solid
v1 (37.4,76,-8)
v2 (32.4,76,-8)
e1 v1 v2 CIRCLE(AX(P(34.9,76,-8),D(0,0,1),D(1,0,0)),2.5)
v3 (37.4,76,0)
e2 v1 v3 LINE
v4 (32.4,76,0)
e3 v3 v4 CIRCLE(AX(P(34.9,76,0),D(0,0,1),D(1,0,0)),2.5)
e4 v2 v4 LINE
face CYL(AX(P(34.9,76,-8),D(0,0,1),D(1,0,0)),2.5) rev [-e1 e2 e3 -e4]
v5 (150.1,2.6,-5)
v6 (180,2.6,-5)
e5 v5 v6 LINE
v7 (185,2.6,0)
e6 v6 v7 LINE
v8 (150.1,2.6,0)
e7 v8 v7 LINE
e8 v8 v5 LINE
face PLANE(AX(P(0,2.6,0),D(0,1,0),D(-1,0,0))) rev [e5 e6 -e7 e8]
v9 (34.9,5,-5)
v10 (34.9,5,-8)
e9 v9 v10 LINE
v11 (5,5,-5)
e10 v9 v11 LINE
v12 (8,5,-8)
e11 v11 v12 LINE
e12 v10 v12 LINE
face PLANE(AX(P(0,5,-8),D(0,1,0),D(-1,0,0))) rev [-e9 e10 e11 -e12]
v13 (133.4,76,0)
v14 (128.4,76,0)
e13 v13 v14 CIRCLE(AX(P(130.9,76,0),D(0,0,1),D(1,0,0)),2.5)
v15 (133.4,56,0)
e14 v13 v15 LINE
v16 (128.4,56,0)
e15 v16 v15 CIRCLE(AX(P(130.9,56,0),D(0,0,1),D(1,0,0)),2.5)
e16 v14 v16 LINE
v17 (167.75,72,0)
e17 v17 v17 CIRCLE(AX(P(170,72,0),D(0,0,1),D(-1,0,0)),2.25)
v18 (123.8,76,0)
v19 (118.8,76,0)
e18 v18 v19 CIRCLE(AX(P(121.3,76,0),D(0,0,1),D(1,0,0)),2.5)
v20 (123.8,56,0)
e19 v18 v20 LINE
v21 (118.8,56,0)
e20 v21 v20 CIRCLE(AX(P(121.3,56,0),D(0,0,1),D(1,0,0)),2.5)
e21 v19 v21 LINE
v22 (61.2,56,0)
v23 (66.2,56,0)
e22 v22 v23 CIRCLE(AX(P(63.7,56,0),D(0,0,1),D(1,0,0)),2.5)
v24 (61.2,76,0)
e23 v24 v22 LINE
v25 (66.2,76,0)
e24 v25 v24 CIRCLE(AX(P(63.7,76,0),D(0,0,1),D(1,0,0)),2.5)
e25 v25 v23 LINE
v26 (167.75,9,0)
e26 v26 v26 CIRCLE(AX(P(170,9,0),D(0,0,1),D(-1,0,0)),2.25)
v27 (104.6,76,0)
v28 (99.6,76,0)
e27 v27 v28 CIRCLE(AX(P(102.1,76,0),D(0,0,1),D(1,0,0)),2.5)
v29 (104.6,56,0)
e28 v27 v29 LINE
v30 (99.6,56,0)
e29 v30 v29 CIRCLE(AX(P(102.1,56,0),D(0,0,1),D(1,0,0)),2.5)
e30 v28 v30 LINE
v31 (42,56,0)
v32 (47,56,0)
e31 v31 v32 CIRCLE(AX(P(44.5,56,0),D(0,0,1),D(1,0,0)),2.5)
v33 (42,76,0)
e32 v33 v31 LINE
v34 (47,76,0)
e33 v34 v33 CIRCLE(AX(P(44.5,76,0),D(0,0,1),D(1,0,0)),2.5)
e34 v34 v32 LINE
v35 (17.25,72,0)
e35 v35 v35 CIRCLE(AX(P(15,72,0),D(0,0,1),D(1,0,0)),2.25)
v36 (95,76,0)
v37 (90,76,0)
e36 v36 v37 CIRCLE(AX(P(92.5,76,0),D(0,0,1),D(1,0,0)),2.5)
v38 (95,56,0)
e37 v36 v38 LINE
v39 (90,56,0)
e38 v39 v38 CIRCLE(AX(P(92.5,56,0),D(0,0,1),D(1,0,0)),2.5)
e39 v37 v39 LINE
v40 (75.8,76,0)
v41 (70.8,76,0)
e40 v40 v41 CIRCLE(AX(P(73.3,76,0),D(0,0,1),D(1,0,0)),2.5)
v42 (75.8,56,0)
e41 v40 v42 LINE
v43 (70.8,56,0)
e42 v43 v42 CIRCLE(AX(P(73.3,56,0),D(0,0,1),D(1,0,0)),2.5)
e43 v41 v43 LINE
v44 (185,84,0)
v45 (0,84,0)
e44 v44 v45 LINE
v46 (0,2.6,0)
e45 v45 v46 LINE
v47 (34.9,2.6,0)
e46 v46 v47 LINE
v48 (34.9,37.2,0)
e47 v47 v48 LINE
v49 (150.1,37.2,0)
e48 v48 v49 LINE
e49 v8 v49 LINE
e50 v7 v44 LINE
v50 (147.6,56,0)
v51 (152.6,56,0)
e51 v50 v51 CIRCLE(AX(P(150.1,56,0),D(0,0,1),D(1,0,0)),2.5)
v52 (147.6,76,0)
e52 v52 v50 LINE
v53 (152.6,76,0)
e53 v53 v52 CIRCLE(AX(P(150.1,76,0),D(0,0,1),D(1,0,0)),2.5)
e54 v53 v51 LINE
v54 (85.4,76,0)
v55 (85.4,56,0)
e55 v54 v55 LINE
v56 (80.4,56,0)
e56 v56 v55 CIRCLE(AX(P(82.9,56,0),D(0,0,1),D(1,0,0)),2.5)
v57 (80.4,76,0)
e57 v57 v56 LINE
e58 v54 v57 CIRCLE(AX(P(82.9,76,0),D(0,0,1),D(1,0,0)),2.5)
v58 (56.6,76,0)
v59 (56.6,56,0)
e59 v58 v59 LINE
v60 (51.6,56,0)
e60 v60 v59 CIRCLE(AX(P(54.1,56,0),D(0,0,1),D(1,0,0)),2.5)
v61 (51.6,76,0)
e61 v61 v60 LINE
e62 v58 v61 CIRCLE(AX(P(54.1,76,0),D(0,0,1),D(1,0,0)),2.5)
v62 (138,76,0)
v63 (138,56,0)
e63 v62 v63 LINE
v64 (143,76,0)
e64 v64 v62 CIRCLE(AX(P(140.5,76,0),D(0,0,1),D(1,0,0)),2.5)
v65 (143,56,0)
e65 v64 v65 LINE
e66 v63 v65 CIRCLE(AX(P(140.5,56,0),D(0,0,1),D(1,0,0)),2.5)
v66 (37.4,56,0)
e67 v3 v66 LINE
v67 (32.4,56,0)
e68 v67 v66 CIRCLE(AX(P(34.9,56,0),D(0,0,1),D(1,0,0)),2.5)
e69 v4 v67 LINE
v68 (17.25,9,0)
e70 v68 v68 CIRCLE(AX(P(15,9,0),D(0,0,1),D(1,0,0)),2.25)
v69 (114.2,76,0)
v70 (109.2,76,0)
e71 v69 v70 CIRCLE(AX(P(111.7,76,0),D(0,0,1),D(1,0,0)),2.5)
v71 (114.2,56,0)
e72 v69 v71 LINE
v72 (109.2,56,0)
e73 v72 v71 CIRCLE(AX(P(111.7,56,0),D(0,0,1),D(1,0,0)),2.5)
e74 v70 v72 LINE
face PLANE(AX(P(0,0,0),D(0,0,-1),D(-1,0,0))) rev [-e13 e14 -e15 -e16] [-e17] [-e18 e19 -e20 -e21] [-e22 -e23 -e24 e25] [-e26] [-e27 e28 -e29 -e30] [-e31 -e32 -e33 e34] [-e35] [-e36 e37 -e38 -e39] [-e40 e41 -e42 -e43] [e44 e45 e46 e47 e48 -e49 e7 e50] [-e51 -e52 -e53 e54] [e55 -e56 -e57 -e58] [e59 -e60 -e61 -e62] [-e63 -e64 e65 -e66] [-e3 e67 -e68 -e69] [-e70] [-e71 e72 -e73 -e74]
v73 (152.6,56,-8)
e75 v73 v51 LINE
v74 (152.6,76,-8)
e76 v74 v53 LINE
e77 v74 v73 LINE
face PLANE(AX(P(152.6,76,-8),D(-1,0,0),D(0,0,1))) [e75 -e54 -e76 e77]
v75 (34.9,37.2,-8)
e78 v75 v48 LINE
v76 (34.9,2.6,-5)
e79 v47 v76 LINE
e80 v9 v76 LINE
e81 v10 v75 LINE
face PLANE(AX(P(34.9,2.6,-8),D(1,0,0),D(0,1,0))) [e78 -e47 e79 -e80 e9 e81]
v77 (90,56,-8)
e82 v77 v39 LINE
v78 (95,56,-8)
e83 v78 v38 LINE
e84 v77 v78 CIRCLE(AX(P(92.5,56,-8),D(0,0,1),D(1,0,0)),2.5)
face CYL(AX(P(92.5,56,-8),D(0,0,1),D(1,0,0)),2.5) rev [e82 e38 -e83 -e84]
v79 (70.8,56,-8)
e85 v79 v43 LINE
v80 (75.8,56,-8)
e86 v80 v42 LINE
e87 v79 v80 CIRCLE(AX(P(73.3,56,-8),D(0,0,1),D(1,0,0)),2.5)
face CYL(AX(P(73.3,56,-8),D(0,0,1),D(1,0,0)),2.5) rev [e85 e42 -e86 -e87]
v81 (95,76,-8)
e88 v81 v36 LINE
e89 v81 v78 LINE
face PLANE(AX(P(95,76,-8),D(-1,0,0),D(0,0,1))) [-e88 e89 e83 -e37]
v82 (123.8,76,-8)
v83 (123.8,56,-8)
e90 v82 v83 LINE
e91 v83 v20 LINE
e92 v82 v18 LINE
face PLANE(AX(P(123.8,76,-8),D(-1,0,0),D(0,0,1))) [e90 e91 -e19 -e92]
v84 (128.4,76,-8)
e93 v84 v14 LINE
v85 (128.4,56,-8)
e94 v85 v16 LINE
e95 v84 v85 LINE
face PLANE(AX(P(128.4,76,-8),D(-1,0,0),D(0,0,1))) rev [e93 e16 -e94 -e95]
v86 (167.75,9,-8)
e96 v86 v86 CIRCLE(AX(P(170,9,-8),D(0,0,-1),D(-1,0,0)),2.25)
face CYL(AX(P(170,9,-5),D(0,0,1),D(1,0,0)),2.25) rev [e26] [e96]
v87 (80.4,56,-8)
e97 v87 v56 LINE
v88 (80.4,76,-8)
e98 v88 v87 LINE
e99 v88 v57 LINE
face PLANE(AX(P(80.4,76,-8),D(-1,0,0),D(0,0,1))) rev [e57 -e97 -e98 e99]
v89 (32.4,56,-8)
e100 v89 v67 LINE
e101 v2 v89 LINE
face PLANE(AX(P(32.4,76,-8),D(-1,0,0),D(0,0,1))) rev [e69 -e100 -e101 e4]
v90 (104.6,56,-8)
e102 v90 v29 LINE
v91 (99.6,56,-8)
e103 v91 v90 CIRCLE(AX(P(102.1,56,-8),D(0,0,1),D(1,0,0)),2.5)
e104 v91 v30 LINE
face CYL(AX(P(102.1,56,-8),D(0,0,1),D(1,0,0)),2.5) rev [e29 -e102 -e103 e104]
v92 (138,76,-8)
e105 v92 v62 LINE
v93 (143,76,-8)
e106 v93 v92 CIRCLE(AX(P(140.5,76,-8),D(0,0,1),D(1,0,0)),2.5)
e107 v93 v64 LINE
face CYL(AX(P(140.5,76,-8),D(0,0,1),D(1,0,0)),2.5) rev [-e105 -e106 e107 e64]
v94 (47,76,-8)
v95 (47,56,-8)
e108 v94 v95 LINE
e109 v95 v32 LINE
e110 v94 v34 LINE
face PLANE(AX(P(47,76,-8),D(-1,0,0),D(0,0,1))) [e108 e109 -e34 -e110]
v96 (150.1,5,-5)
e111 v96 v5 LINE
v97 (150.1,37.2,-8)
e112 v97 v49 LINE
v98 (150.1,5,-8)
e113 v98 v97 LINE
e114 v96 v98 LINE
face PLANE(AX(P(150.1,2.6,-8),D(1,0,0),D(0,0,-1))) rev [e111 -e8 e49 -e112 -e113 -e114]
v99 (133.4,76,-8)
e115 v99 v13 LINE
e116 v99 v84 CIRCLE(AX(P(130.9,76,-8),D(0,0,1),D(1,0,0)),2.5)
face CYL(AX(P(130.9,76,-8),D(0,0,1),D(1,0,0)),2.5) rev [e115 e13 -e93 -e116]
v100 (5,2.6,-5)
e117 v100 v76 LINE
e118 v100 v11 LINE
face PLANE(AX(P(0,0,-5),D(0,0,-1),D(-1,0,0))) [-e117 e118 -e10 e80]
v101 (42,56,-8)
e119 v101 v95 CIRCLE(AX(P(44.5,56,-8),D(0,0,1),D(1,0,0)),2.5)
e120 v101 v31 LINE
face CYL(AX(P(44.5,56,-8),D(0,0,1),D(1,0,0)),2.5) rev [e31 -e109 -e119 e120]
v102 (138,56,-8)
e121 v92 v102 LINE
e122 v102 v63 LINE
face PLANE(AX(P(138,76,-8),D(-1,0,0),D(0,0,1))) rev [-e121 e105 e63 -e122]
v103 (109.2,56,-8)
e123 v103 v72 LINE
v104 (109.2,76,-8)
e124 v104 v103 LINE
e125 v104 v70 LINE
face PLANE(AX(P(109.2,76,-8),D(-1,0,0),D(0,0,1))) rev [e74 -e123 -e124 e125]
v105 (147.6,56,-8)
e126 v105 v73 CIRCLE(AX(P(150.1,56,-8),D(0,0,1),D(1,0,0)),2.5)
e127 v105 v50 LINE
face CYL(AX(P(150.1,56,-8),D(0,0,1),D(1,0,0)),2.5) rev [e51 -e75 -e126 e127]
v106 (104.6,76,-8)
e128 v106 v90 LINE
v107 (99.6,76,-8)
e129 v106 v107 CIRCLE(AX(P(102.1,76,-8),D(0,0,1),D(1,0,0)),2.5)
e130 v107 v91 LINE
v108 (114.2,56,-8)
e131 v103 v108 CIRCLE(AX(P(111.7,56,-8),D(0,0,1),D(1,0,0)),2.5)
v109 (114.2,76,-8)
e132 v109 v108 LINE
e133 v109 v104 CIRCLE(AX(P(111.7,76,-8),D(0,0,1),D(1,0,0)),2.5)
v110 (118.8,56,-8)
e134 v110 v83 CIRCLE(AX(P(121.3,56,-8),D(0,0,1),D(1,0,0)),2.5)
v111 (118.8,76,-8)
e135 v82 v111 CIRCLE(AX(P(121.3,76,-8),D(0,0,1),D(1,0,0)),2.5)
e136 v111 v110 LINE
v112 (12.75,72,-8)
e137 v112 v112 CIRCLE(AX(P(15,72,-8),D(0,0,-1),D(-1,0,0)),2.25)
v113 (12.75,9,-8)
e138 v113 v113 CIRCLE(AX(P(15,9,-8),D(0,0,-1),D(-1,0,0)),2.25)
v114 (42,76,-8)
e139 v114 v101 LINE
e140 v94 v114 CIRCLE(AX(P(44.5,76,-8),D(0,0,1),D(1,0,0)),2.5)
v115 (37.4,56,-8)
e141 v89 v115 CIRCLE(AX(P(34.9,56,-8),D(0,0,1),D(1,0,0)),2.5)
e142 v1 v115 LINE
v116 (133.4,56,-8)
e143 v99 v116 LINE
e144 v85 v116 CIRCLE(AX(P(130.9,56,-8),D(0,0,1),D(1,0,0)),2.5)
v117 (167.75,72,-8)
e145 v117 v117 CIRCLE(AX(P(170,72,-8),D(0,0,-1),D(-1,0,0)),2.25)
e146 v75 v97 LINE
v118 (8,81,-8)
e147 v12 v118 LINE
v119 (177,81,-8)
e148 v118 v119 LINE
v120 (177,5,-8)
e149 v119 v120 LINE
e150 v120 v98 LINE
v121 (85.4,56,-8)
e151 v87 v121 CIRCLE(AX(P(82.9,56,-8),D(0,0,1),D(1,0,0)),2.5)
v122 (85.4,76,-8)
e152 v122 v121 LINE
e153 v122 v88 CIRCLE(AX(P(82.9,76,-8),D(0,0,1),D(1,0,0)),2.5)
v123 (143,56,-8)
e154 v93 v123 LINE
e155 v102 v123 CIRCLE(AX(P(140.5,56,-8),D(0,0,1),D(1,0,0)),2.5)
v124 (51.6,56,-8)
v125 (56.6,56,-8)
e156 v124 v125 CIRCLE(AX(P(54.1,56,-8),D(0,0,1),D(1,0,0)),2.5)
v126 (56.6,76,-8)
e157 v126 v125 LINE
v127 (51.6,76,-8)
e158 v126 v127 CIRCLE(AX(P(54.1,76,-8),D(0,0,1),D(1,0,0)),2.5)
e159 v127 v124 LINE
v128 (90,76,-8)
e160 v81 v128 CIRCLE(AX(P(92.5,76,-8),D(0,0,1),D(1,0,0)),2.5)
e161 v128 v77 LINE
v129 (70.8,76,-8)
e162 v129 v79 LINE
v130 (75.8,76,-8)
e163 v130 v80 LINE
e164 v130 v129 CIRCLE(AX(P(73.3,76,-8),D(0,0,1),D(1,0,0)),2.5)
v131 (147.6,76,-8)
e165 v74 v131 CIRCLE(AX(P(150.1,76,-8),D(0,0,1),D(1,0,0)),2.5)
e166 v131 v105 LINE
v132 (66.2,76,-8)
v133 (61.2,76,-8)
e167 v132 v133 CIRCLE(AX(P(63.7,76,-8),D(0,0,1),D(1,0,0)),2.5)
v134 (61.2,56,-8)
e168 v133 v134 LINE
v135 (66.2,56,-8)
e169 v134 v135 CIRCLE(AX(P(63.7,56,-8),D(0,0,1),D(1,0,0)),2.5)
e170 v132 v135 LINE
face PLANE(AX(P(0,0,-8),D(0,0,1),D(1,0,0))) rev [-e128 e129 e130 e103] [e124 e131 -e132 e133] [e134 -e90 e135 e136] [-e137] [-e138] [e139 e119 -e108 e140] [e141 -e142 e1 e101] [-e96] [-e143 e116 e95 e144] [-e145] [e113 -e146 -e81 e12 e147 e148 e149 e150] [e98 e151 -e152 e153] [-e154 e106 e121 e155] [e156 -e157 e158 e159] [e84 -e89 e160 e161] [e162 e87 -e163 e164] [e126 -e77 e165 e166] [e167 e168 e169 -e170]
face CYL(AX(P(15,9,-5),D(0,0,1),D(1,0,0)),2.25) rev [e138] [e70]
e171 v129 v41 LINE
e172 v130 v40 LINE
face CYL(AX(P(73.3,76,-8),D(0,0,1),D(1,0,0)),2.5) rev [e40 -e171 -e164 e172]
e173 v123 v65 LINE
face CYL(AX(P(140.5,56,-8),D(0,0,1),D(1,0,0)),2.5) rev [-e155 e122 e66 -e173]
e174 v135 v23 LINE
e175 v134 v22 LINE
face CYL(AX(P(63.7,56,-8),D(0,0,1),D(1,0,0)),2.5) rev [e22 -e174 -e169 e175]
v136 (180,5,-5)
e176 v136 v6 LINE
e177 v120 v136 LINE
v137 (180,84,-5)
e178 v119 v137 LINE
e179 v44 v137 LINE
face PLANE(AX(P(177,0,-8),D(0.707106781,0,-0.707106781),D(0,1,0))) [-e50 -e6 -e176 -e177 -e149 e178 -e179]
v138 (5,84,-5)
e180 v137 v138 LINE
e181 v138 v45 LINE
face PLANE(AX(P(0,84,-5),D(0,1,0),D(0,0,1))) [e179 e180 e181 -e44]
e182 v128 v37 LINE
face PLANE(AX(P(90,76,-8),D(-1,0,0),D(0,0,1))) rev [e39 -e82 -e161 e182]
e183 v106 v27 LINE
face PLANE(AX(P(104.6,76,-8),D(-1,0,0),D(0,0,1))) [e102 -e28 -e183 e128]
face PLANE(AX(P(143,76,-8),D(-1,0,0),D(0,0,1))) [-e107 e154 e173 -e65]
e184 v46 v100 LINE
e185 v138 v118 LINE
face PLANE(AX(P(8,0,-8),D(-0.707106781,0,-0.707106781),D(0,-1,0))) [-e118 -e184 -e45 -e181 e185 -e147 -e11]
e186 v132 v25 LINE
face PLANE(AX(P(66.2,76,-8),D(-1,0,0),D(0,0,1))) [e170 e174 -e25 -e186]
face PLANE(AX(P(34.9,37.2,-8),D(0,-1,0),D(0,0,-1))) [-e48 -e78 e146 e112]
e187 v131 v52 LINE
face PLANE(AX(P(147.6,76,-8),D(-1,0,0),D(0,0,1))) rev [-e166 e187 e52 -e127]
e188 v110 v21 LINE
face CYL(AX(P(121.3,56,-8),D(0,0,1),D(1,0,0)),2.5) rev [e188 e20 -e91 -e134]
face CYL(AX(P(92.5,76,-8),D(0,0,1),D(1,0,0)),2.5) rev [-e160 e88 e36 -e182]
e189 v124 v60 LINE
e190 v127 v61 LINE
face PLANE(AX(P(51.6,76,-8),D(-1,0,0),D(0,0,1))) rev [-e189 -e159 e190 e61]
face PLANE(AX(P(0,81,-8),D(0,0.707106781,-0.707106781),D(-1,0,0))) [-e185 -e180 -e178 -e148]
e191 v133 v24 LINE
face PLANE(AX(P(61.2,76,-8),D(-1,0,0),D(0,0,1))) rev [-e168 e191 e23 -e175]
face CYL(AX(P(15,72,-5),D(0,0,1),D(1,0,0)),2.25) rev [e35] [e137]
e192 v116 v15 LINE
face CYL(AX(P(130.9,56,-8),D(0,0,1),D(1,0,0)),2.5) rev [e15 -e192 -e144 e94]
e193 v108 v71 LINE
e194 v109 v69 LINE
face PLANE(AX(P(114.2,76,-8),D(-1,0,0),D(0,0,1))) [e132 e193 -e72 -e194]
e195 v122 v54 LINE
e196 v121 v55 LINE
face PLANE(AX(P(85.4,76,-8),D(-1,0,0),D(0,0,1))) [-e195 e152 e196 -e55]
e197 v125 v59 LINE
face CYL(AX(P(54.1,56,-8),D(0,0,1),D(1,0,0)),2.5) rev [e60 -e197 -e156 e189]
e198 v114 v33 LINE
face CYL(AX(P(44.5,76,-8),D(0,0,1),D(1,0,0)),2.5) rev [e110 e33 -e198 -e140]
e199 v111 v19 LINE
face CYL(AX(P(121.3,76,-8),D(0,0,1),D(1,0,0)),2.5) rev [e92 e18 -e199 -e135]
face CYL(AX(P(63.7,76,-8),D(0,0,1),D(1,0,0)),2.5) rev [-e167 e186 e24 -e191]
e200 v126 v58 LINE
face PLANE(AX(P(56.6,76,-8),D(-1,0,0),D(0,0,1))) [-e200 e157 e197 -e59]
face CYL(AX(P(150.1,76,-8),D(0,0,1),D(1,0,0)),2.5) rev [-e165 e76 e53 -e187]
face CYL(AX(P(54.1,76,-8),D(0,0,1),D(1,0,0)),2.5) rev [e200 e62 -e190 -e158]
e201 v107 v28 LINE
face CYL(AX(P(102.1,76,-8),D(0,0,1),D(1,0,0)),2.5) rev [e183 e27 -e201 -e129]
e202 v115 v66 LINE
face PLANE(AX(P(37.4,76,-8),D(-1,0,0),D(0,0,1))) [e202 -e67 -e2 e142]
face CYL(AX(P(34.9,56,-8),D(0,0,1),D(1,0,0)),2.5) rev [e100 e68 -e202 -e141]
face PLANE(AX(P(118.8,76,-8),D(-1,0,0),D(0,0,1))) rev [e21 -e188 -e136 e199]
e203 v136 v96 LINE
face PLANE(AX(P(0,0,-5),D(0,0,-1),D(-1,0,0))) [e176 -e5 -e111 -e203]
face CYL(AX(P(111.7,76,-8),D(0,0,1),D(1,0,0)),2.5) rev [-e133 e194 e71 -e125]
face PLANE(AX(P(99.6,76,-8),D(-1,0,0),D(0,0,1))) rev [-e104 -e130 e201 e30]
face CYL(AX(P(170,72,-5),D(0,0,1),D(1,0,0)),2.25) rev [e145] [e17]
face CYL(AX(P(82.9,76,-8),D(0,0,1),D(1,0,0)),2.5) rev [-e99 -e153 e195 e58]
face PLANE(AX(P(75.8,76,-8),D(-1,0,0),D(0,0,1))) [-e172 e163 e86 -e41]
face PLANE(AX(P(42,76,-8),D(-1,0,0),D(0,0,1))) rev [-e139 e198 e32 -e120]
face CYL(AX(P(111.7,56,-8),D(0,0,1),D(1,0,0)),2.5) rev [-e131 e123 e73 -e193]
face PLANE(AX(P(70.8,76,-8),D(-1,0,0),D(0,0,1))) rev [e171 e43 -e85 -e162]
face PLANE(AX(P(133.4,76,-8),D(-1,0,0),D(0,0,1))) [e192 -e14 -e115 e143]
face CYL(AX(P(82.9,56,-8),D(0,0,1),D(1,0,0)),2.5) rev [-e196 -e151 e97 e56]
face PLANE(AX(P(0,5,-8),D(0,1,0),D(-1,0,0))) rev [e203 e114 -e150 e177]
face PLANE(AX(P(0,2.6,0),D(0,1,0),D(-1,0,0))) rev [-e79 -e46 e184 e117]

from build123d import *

# Parameters (mm, degrees)
SKETCH1_W           = 185
SKETCH1_H           = 84
SKETCH1_R           = 2.25
BOSS_EXTRUDE1_DEPTH = 5
SKETCH2_W           = 185
SKETCH2_H           = 79
SKETCH2_R           = 2.25
BOSS_EXTRUDE2_DEPTH = 3
CHAMFER1_SIZE       = 8
CHAMFER3_SIZE       = 3
SKETCH3_W           = 7.071067812
SKETCH3_H           = 2.6
CUT_EXTRUDE1_DEPTH  = 221.270985121
SKETCH4_W           = 115.2
SKETCH4_H           = 34.6
CUT_EXTRUDE2_DEPTH  = 204.334699449


with BuildPart() as part:
    # Sketch1 → Boss-Extrude1 (new body)
    with BuildSketch(Plane.XY):
        with Locations((92.5, 42)):
            Rectangle(SKETCH1_W, SKETCH1_H)
        with Locations((15, 9)):
            Circle(SKETCH1_R, mode=Mode.SUBTRACT)
        with Locations(Location((170, 9, 0), (0, 0, 180))):
            Circle(SKETCH1_R, mode=Mode.SUBTRACT)
        with Locations((15, 72)):
            Circle(SKETCH1_R, mode=Mode.SUBTRACT)
        with Locations(Location((170, 72, 0), (0, 0, 180))):
            Circle(SKETCH1_R, mode=Mode.SUBTRACT)
    extrude(amount=-BOSS_EXTRUDE1_DEPTH)

    # Sketch2 → Boss-Extrude2 (add)
    with BuildSketch(Plane(origin=(0, 0, -5), x_dir=(-1, 0, 0), z_dir=(0, 0, -1))):
        with Locations((-92.5, 44.5)):
            Rectangle(SKETCH2_W, SKETCH2_H)
        with Locations(Location((-15, 9, 0), (0, 0, 180))):
            Circle(SKETCH2_R, mode=Mode.SUBTRACT)
        with Locations((-170, 9)):
            Circle(SKETCH2_R, mode=Mode.SUBTRACT)
        with Locations(Location((-15, 72, 0), (0, 0, 180))):
            Circle(SKETCH2_R, mode=Mode.SUBTRACT)
        with Locations((-170, 72)):
            Circle(SKETCH2_R, mode=Mode.SUBTRACT)
    extrude(amount=BOSS_EXTRUDE2_DEPTH)

    # Chamfer1
    # the kernel refuses this chamfer: 8 mm, written as the material it takes off along each edge
    with BuildSketch(Plane(origin=(185, -15.573463904, -8), x_dir=(-0.9996219169112968, 0, -0.027495876610586296), z_dir=(0, 1, 0)), Plane(origin=(0, 104.573463904, -8), x_dir=(0.9996219169112968, 0, -0.027495876610586275), z_dir=(0, -1, 0))) as chamfer1_piece_1:
        Polygon((CHAMFER1_SIZE * 0.999621916911, CHAMFER1_SIZE * 0.0274958766106), (-CHAMFER1_SIZE * 0.0274958766106, CHAMFER1_SIZE * 0.999621916911), (0, 0), align=None)
    extrude(amount=120.146927807, mode=Mode.SUBTRACT)

    # Chamfer3
    chamfer3_edges = [part.edges().sort_by_distance(p)[0] for p in [
        (92.5, 84, -8),
    ]]
    chamfer(chamfer3_edges, length=CHAMFER3_SIZE)

    # Sketch3 → Cut-Extrude1 (cut, through all, along a direction that is not the sketch's normal)
    with BuildSketch(Plane(origin=(92.5, 0, -92.5), x_dir=(-0.7071067811865452, 0, -0.7071067811865498), z_dir=(0.7071067811865498, 0, -0.7071067811865452))):
        with Locations((-127.279220614, 1.3)):
            Rectangle(SKETCH3_W, SKETCH3_H)
    extrude(amount=-CUT_EXTRUDE1_DEPTH, dir=(1, 0, 0), mode=Mode.SUBTRACT)

    # Sketch4 → Cut-Extrude2 (cut, through all)
    with BuildSketch(Plane.XY):
        with Locations((92.5, 19.9)):
            Rectangle(SKETCH4_W, SKETCH4_H)
        with BuildLine():
            Line((37.4, 76), (37.4, 56))
            ThreePointArc((37.4, 56), (34.9, 53.5), (32.4, 56))
            Line((32.4, 56), (32.4, 76))
            ThreePointArc((32.4, 76), (34.9, 78.5), (37.4, 76))
        make_face()
        with BuildLine():
            Line((47, 76), (47, 56))
            ThreePointArc((47, 56), (44.5, 53.5), (42, 56))
            Line((42, 56), (42, 76))
            ThreePointArc((42, 76), (44.5, 78.5), (47, 76))
        make_face()
        with BuildLine():
            Line((56.6, 76), (56.6, 56))
            ThreePointArc((56.6, 56), (54.1, 53.5), (51.6, 56))
            Line((51.6, 56), (51.6, 76))
            ThreePointArc((51.6, 76), (54.1, 78.5), (56.6, 76))
        make_face()
        with BuildLine():
            Line((66.2, 76), (66.2, 56))
            ThreePointArc((66.2, 56), (63.7, 53.5), (61.2, 56))
            Line((61.2, 56), (61.2, 76))
            ThreePointArc((61.2, 76), (63.7, 78.5), (66.2, 76))
        make_face()
        with BuildLine():
            Line((75.8, 76), (75.8, 56))
            ThreePointArc((75.8, 56), (73.3, 53.5), (70.8, 56))
            Line((70.8, 56), (70.8, 76))
            ThreePointArc((70.8, 76), (73.3, 78.5), (75.8, 76))
        make_face()
        with BuildLine():
            Line((85.4, 76), (85.4, 56))
            ThreePointArc((85.4, 56), (82.9, 53.5), (80.4, 56))
            Line((80.4, 56), (80.4, 76))
            ThreePointArc((80.4, 76), (82.9, 78.5), (85.4, 76))
        make_face()
        with BuildLine():
            Line((95, 76), (95, 56))
            ThreePointArc((95, 56), (92.5, 53.5), (90, 56))
            Line((90, 56), (90, 76))
            ThreePointArc((90, 76), (92.5, 78.5), (95, 76))
        make_face()
        with BuildLine():
            Line((104.6, 76), (104.6, 56))
            ThreePointArc((104.6, 56), (102.1, 53.5), (99.6, 56))
            Line((99.6, 56), (99.6, 76))
            ThreePointArc((99.6, 76), (102.1, 78.5), (104.6, 76))
        make_face()
        with BuildLine():
            Line((114.2, 76), (114.2, 56))
            ThreePointArc((114.2, 56), (111.7, 53.5), (109.2, 56))
            Line((109.2, 56), (109.2, 76))
            ThreePointArc((109.2, 76), (111.7, 78.5), (114.2, 76))
        make_face()
        with BuildLine():
            Line((123.8, 76), (123.8, 56))
            ThreePointArc((123.8, 56), (121.3, 53.5), (118.8, 56))
            Line((118.8, 56), (118.8, 76))
            ThreePointArc((118.8, 76), (121.3, 78.5), (123.8, 76))
        make_face()
        with BuildLine():
            Line((133.4, 76), (133.4, 56))
            ThreePointArc((133.4, 56), (130.9, 53.5), (128.4, 56))
            Line((128.4, 56), (128.4, 76))
            ThreePointArc((128.4, 76), (130.9, 78.5), (133.4, 76))
        make_face()
        with BuildLine():
            Line((143, 76), (143, 56))
            ThreePointArc((143, 56), (140.5, 53.5), (138, 56))
            Line((138, 56), (138, 76))
            ThreePointArc((138, 76), (140.5, 78.5), (143, 76))
        make_face()
        with BuildLine():
            Line((152.6, 76), (152.6, 56))
            ThreePointArc((152.6, 56), (150.1, 53.5), (147.6, 56))
            Line((147.6, 56), (147.6, 76))
            ThreePointArc((147.6, 76), (150.1, 78.5), (152.6, 76))
        make_face()
    extrude(amount=-CUT_EXTRUDE2_DEPTH, mode=Mode.SUBTRACT)


solid = part.part
